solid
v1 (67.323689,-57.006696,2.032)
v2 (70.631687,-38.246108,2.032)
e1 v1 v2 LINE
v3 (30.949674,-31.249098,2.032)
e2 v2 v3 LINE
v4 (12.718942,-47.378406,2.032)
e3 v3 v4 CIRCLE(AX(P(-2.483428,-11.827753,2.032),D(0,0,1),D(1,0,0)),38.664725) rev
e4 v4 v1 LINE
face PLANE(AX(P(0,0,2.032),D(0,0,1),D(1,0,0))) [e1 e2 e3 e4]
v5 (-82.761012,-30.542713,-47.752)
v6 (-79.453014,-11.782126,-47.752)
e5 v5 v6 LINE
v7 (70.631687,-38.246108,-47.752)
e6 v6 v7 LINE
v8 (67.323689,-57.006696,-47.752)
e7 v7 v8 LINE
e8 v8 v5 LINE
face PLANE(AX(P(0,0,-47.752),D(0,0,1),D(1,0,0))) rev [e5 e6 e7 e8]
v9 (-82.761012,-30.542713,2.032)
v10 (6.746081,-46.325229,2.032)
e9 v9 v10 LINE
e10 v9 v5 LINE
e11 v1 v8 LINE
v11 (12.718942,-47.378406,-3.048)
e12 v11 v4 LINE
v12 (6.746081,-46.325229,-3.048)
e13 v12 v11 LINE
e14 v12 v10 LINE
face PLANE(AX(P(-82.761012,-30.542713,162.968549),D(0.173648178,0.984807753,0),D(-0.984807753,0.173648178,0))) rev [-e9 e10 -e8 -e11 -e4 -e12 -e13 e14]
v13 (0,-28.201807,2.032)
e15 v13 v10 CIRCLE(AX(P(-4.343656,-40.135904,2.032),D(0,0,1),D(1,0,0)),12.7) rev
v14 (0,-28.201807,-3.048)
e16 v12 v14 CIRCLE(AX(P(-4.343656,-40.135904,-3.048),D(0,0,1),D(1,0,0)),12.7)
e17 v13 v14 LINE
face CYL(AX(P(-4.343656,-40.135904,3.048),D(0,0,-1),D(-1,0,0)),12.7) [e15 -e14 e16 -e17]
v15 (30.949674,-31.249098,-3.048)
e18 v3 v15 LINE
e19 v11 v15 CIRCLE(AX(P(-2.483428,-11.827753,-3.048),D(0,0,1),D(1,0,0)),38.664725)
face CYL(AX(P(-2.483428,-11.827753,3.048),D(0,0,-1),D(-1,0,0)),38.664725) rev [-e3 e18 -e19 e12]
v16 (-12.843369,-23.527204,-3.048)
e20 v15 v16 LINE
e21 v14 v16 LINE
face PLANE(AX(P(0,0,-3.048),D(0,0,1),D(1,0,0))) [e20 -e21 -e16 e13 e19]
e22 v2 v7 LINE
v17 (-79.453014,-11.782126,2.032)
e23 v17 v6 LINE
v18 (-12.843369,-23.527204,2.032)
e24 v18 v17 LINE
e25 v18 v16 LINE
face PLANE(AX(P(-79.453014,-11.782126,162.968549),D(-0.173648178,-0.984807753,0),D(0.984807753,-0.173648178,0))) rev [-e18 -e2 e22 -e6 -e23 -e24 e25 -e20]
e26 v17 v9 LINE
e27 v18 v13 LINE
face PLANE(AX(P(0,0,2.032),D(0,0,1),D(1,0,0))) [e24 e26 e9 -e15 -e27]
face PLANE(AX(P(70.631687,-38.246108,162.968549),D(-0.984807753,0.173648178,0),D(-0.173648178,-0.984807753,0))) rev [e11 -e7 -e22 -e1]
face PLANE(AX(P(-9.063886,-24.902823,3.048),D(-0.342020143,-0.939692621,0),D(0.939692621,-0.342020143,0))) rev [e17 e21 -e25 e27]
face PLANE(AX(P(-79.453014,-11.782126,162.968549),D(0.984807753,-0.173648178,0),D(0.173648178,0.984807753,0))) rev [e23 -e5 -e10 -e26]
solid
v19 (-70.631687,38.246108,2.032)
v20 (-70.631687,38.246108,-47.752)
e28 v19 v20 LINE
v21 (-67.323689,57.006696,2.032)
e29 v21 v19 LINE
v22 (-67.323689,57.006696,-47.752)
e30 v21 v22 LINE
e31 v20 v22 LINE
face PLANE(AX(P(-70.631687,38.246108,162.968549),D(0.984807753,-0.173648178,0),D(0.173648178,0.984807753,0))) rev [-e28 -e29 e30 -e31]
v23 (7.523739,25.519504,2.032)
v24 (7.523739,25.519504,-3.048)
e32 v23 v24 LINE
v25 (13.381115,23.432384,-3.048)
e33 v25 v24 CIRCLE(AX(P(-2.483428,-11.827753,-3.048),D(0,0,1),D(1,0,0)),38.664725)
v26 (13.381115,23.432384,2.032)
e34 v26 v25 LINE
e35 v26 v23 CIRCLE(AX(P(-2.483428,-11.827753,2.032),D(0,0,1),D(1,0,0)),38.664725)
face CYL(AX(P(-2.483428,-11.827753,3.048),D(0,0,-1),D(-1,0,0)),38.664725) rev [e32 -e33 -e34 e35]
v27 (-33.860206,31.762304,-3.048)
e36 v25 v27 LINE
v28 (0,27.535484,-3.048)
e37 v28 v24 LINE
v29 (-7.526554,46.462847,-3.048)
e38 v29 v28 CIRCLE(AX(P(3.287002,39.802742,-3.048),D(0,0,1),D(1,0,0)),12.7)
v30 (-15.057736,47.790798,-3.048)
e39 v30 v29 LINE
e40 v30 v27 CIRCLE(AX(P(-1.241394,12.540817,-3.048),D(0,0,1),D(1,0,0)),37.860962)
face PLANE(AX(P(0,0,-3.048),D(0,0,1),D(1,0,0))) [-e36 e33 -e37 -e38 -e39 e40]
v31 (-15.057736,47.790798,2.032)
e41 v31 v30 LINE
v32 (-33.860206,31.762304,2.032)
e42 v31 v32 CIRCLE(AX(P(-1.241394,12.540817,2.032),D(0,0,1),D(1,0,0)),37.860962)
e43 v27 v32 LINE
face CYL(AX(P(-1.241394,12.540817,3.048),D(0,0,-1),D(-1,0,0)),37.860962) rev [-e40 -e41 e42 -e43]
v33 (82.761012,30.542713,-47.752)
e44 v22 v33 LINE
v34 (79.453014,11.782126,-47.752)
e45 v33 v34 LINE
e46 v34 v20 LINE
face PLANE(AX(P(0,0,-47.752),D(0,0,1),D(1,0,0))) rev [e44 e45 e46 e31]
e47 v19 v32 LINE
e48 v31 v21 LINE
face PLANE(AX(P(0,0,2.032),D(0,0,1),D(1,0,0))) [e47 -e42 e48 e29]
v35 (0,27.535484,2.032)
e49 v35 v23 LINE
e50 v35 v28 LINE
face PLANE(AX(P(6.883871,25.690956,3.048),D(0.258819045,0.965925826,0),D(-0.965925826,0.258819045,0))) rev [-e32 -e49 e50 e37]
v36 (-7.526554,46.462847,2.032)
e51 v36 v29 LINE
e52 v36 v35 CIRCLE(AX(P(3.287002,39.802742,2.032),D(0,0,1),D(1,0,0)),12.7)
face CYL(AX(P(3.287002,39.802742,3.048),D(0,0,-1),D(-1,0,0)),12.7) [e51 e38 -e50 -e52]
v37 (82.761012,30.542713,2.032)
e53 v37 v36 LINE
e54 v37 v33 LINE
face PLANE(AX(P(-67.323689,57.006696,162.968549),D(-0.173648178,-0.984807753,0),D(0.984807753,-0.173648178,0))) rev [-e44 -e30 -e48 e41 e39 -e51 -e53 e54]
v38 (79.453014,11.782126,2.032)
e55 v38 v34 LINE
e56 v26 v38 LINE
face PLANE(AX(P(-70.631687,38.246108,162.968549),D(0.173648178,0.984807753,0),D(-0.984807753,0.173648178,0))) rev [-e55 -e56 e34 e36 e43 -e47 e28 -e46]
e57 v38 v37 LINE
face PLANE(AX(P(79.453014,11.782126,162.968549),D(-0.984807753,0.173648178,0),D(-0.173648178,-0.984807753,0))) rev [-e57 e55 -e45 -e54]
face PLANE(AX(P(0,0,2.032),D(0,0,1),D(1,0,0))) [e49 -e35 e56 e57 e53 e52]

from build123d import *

# Parameters (mm, degrees)
BOSS_EXTRUDE1_DEPTH        = 3.048
BOSS_EXTRUDE2_DEPTH        = 2.032
BOSS_EXTRUDE2_DEPTH_BACK   = 47.752
BOSS_EXTRUDE2_2_DEPTH      = 2.032
BOSS_EXTRUDE2_2_DEPTH_BACK = 47.752
INTERSECT1_START           = -3.048
INTERSECT1_DEPTH           = 6.096


# Read off the part's stored shape, not the designer's step: Intersect1
with BuildPart() as part:
    # Sketch1 → Boss-Extrude1 (new, symmetric)
    with BuildSketch(Plane.XY):
        with BuildLine():
            ThreePointArc((0, 27.535484012), (-9.412998127, 39.802742006), (0, 52.07))
            Line((0, 52.07), (-11.040532194, 49.111698314))
            ThreePointArc((-11.040532194, 49.111698314), (-39.066320922, 14.192289272), (-14.190605813, -23.03684931))
            Line((-14.190605813, -23.03684931), (0, -28.201807432))
            ThreePointArc((0, -28.201807432), (8.35634418, -40.135903716), (0, -52.07))
            Line((0, -52.07), (10.740686656, -48.160709762))
            ThreePointArc((10.740686656, -48.160709762), (36.144496882, -10.141220984), (7.52373904, 25.519504212))
            Line((7.52373904, 25.519504212), (0, 27.535484012))
        make_face()
        with BuildLine():
            Line((-12.7, 7.332348419), (-1.374815329, 13.870946837))
            ThreePointArc((-1.374815329, 13.870946837), (-0.410875234, 16.198104087), (1.5875, 14.664696837))
            ThreePointArc((1.5875, 14.664696837), (1.533407249, 14.253821603), (1.374815329, 13.870946837))
            Line((1.374815329, 13.870946837), (12.7, 7.332348419))
            Line((12.7, 7.332348419), (12.7, -7.332348419))
            Line((12.7, -7.332348419), (0, -14.664696837))
            Line((0, -14.664696837), (-12.7, -7.332348419))
            Line((-12.7, -7.332348419), (-12.7, 7.332348419))
        make_face(mode=Mode.SUBTRACT)
    extrude(amount=BOSS_EXTRUDE1_DEPTH, both=True)


with BuildPart() as body_2:
    # Sketch2 → Boss-Extrude2 (new, two sides: drawn at the far end of the back side and taken through both)
    with BuildSketch(Plane.XY.offset(-BOSS_EXTRUDE2_DEPTH_BACK)):
        Polygon((-70.631687067, 38.246108065), (79.453014492, 11.782125788), (82.761012277, 30.542713483), (-67.323689282, 57.00669576), align=None)
    extrude(amount=BOSS_EXTRUDE2_DEPTH + BOSS_EXTRUDE2_DEPTH_BACK)


with BuildPart() as body_3:
    # Sketch2 → Boss-Extrude2 2 (new, two sides: drawn at the far end of the back side and taken through both)
    with BuildSketch(Plane.XY.offset(-BOSS_EXTRUDE2_2_DEPTH_BACK)):
        Polygon((-79.453014492, -11.782125788), (70.631687067, -38.246108065), (67.323689282, -57.00669576), (-82.761012277, -30.542713483), align=None)
    extrude(amount=BOSS_EXTRUDE2_2_DEPTH + BOSS_EXTRUDE2_2_DEPTH_BACK)


with BuildPart() as intersect1_tool:
    # Intersect1 outline → Intersect1 (new body)
    with BuildSketch(Plane.XY.offset(INTERSECT1_START)):
        with BuildLine():
            Line((0, 52.07), (-11.040532194, 49.111698314))
            ThreePointArc((-11.040532194, 49.111698314), (-39.066320922, 14.192289271), (-14.190605813, -23.03684931))
            Line((-14.190605813, -23.03684931), (0, -28.201807432))
            ThreePointArc((0, -28.201807432), (8.35634418, -40.135903716), (0, -52.07))
            Line((0, -52.07), (10.740686656, -48.160709762))
            ThreePointArc((10.740686656, -48.160709762), (36.144496882, -10.141220984), (7.52373904, 25.519504212))
            Line((7.52373904, 25.519504212), (0, 27.535484012))
            ThreePointArc((0, 27.535484012), (-9.412998127, 39.802742006), (0, 52.07))
        make_face()
        with BuildLine():
            Line((-12.7, 7.332348419), (-1.374815329, 13.870946837))
            ThreePointArc((-1.374815329, 13.870946837), (0, 16.252196837), (1.374815329, 13.870946837))
            Line((1.374815329, 13.870946837), (12.7, 7.332348419))
            Line((12.7, 7.332348419), (12.7, -7.332348419))
            Line((12.7, -7.332348419), (0, -14.664696837))
            Line((0, -14.664696837), (-12.7, -7.332348419))
            Line((-12.7, -7.332348419), (-12.7, 7.332348419))
        make_face(mode=Mode.SUBTRACT)
    extrude(amount=INTERSECT1_DEPTH)


with BuildPart() as part_1:
    add(part.part)

    # Intersect1: cut by intersect1_tool
    add(intersect1_tool.part, mode=Mode.SUBTRACT)


with BuildPart() as body_2_1:
    add(body_2.part)

    # Intersect1: cut by intersect1_tool
    add(intersect1_tool.part, mode=Mode.SUBTRACT)


with BuildPart() as body_3_1:
    add(body_3.part)

    # Intersect1: cut by intersect1_tool
    add(intersect1_tool.part, mode=Mode.SUBTRACT)


solid = Compound([body_2_1.part, body_3_1.part])
